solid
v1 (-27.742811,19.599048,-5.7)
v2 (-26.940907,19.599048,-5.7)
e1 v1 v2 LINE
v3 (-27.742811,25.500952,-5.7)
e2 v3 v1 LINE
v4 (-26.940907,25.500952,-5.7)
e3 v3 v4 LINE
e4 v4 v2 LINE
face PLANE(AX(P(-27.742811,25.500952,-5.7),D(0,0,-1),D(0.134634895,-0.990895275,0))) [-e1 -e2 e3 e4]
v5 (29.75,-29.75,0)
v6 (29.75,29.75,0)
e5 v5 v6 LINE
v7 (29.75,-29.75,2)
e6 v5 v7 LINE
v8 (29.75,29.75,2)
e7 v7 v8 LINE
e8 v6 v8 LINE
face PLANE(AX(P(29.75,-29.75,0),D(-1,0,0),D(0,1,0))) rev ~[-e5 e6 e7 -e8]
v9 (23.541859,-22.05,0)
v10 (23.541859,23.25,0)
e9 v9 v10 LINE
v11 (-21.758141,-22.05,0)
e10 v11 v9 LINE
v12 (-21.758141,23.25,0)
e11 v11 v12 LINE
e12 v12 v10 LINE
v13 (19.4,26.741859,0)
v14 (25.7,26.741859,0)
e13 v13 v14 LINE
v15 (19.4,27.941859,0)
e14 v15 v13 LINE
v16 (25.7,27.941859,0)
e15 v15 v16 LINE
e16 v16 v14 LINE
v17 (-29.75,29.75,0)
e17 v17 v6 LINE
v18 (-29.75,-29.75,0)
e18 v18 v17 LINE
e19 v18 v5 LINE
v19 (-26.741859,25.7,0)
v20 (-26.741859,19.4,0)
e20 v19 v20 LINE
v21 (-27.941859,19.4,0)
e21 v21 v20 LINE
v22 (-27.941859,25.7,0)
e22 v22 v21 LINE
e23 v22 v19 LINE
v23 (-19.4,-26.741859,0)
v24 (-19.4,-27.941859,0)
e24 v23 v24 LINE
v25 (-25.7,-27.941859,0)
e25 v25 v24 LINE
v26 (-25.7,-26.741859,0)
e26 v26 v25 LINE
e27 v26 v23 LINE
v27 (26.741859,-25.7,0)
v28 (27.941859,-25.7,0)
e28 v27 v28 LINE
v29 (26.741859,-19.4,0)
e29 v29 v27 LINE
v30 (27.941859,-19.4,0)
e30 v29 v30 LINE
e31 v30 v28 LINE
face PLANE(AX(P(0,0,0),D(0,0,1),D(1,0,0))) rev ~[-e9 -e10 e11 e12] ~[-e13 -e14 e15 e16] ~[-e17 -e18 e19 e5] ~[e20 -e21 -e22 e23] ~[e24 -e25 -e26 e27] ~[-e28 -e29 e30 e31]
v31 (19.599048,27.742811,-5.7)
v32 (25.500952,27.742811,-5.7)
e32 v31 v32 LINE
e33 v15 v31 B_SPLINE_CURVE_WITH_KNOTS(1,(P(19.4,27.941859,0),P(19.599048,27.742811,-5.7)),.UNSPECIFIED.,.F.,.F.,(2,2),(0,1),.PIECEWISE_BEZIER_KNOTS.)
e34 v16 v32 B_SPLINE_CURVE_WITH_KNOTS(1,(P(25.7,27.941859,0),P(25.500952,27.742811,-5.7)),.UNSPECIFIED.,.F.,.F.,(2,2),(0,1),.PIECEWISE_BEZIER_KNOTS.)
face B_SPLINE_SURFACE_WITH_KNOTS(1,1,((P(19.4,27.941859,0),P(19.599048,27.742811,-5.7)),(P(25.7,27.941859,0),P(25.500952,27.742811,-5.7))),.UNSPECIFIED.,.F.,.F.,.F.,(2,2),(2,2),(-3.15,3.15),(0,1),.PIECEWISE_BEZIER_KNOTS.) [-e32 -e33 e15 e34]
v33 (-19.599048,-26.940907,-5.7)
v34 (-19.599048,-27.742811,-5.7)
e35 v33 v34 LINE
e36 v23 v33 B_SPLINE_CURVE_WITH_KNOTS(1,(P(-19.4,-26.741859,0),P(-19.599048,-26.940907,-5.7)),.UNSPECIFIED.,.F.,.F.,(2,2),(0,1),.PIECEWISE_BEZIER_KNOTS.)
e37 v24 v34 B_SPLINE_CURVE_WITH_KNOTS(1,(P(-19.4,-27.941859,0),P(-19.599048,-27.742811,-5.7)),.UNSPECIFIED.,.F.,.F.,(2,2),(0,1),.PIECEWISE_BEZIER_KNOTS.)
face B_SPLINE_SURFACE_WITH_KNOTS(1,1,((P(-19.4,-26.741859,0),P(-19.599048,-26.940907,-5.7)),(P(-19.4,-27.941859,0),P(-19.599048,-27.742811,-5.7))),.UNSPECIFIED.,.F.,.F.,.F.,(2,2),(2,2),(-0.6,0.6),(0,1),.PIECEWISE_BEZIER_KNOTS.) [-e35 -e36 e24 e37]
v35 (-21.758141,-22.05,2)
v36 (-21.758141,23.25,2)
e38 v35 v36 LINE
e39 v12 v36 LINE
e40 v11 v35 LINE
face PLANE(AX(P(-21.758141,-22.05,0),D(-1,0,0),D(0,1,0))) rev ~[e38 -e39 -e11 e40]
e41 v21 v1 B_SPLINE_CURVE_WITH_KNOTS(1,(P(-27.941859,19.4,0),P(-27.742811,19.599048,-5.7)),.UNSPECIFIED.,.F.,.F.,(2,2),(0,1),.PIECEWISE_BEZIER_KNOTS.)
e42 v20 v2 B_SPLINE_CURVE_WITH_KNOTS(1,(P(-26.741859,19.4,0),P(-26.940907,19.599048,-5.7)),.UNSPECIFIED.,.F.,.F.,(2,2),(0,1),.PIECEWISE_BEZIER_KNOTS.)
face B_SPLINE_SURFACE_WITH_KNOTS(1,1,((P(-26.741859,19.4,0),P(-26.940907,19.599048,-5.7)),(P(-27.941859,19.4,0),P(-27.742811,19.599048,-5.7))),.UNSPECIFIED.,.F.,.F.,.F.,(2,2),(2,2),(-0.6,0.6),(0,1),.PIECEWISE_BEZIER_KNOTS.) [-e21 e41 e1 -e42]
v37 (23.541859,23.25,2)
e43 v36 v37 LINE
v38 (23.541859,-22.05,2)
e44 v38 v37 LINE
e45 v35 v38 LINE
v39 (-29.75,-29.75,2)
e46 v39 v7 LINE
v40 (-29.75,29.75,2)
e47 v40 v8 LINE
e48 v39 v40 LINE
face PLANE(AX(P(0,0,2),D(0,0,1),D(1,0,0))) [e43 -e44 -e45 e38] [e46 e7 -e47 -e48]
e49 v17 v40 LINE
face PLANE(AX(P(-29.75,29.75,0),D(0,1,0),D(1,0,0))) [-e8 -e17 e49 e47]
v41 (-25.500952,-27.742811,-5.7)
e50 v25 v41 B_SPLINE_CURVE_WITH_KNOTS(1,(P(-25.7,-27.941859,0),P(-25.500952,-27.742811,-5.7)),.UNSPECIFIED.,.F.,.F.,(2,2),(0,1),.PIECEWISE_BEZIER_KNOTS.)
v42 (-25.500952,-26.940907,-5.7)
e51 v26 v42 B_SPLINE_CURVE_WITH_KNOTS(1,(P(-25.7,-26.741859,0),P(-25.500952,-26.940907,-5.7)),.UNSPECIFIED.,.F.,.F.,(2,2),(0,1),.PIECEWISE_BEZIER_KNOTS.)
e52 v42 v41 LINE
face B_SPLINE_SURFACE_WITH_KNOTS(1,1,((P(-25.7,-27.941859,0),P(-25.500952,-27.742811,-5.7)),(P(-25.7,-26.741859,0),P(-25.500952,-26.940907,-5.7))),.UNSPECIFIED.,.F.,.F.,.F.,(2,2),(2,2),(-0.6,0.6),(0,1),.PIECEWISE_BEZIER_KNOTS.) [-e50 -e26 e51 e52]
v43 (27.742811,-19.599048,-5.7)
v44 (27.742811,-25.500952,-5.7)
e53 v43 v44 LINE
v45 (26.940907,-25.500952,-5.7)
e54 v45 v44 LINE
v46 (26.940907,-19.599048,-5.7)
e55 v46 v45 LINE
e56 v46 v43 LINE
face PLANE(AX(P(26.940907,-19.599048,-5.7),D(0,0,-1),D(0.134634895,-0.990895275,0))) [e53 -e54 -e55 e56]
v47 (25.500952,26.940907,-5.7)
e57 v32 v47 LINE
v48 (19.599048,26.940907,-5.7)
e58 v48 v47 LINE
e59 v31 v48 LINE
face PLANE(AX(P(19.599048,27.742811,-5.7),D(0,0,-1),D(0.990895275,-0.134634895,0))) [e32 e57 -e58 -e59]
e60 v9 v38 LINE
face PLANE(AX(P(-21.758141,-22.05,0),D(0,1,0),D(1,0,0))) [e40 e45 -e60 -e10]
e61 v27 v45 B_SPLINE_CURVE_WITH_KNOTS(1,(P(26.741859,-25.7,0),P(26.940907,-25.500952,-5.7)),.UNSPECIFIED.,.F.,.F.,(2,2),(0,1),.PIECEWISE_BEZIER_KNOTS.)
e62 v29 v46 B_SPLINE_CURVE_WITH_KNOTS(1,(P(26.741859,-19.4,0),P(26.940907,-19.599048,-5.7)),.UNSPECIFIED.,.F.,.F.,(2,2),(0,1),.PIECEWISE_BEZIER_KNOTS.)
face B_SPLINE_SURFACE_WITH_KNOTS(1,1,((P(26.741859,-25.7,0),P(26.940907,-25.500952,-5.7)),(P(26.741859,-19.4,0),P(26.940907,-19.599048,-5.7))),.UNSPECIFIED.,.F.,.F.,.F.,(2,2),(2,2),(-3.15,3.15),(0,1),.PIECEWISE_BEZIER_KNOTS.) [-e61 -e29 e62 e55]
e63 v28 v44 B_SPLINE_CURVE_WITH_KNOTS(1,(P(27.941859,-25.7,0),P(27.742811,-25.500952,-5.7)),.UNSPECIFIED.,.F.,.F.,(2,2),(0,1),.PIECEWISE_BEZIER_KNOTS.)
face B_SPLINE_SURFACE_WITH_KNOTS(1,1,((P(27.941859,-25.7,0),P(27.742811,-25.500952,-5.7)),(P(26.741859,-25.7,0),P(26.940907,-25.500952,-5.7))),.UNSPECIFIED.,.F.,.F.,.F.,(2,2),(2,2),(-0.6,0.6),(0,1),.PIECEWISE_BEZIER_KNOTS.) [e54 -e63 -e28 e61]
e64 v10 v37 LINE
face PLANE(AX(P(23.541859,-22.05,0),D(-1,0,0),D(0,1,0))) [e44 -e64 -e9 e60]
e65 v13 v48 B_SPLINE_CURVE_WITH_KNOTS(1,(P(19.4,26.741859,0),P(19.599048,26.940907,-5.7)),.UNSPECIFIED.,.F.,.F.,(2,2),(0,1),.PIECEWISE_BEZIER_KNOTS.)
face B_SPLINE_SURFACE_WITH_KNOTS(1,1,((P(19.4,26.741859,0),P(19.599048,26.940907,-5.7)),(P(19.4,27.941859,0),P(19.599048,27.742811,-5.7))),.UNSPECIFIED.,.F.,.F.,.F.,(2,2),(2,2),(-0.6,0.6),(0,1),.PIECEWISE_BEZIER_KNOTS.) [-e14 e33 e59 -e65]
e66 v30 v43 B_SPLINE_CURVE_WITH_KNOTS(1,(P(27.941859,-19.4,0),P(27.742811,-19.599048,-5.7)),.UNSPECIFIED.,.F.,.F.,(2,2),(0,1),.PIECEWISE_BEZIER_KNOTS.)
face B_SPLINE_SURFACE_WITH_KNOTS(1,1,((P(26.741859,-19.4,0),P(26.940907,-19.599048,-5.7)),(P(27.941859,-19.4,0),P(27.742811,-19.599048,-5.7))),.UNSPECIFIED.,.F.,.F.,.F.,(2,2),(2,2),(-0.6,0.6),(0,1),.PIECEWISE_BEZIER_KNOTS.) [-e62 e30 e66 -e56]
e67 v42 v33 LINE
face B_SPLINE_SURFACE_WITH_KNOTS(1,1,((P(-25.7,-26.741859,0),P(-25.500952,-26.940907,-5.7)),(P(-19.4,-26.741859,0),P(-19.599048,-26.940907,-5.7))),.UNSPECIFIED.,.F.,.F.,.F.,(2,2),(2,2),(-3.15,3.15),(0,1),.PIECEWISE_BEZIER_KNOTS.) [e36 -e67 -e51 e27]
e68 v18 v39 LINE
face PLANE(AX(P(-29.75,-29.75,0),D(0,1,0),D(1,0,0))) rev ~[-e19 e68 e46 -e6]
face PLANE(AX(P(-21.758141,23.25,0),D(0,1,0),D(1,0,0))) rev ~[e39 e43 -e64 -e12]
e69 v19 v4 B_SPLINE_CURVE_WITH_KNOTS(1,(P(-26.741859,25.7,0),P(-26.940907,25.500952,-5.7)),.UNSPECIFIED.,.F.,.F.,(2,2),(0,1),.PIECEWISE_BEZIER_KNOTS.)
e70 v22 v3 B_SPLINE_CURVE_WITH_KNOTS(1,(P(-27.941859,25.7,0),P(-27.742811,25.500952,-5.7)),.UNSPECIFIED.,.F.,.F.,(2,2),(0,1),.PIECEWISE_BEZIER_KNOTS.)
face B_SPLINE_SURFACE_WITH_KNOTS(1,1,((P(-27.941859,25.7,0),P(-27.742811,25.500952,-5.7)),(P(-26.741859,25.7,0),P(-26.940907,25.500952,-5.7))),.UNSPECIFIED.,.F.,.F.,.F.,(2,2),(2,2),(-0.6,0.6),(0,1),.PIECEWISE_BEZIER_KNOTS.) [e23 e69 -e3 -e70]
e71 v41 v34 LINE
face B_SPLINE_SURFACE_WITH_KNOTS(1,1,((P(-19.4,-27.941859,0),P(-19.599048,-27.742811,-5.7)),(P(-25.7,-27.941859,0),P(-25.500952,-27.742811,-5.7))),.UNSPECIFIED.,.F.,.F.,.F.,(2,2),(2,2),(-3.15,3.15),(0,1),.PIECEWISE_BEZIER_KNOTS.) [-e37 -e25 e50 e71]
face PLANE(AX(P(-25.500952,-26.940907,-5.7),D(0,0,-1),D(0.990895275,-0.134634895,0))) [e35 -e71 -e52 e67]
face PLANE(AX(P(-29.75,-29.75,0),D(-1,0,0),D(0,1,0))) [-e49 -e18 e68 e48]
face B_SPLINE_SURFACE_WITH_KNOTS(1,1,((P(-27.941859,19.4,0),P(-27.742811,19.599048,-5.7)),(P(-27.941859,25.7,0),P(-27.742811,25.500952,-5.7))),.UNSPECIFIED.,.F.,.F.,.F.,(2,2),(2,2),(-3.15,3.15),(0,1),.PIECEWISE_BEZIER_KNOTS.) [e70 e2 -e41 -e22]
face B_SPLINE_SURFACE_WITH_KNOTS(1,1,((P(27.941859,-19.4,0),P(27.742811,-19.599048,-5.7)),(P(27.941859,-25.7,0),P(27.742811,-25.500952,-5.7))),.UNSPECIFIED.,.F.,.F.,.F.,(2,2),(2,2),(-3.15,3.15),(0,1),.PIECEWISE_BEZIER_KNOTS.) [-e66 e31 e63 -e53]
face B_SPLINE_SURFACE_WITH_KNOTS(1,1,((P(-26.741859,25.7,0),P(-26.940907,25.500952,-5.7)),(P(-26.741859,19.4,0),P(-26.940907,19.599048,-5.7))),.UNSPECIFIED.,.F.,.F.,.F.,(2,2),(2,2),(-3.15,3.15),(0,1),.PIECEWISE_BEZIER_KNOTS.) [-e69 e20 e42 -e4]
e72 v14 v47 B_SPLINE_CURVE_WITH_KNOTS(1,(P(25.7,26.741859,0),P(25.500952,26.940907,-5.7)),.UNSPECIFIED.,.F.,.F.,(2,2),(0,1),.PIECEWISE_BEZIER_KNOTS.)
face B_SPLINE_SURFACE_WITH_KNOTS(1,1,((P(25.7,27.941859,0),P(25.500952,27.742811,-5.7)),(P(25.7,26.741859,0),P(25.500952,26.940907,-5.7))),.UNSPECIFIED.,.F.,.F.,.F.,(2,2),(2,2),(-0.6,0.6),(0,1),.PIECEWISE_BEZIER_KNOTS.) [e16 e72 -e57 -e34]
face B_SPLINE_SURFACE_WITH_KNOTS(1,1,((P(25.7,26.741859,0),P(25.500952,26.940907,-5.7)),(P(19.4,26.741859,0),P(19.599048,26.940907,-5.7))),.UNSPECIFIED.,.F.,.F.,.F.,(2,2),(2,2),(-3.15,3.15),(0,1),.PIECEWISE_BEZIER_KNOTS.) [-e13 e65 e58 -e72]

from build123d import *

# Parameters (mm, degrees)
F0_W     = 59.5
F0_H     = 59.5
F0_W_2   = 45.3
F0_H_2   = 45.3
F1_DEPTH = 2
F2_W     = 1.2
F2_H     = 6.3
F2_W_2   = 6.3
F2_H_2   = 1.2
F3_DEPTH = 5.7
F3_TAPER = 2


# Not quite as in the source:
# - a feature names something its author has since deleted; it is built from what else it names


with BuildPart() as f1:
    # F0 (on Top) → F1 (new body)
    with BuildSketch(Plane.XY):
        Rectangle(F0_W, F0_H)
        with Locations((0.8918590039, 0.6)):
            Rectangle(F0_W_2, F0_H_2, mode=Mode.SUBTRACT)
    extrude(amount=F1_DEPTH)

    # F2 (on face) → F3 (join)
    with BuildSketch(Plane(origin=(0, 0, 0), x_dir=(1, 0, 0), z_dir=(0, 0, -1))):
        with Locations((27.3418590039, 22.55)):
            Rectangle(F2_W, F2_H)
        with Locations((22.55, -27.3418590039)):
            Rectangle(F2_W_2, F2_H_2)
        with Locations((-27.3418590039, -22.55)):
            Rectangle(F2_W, F2_H)
        with Locations((-22.55, 27.3418590039)):
            Rectangle(F2_W_2, F2_H_2)
    extrude(amount=F3_DEPTH, taper=F3_TAPER)


solid = f1.part
